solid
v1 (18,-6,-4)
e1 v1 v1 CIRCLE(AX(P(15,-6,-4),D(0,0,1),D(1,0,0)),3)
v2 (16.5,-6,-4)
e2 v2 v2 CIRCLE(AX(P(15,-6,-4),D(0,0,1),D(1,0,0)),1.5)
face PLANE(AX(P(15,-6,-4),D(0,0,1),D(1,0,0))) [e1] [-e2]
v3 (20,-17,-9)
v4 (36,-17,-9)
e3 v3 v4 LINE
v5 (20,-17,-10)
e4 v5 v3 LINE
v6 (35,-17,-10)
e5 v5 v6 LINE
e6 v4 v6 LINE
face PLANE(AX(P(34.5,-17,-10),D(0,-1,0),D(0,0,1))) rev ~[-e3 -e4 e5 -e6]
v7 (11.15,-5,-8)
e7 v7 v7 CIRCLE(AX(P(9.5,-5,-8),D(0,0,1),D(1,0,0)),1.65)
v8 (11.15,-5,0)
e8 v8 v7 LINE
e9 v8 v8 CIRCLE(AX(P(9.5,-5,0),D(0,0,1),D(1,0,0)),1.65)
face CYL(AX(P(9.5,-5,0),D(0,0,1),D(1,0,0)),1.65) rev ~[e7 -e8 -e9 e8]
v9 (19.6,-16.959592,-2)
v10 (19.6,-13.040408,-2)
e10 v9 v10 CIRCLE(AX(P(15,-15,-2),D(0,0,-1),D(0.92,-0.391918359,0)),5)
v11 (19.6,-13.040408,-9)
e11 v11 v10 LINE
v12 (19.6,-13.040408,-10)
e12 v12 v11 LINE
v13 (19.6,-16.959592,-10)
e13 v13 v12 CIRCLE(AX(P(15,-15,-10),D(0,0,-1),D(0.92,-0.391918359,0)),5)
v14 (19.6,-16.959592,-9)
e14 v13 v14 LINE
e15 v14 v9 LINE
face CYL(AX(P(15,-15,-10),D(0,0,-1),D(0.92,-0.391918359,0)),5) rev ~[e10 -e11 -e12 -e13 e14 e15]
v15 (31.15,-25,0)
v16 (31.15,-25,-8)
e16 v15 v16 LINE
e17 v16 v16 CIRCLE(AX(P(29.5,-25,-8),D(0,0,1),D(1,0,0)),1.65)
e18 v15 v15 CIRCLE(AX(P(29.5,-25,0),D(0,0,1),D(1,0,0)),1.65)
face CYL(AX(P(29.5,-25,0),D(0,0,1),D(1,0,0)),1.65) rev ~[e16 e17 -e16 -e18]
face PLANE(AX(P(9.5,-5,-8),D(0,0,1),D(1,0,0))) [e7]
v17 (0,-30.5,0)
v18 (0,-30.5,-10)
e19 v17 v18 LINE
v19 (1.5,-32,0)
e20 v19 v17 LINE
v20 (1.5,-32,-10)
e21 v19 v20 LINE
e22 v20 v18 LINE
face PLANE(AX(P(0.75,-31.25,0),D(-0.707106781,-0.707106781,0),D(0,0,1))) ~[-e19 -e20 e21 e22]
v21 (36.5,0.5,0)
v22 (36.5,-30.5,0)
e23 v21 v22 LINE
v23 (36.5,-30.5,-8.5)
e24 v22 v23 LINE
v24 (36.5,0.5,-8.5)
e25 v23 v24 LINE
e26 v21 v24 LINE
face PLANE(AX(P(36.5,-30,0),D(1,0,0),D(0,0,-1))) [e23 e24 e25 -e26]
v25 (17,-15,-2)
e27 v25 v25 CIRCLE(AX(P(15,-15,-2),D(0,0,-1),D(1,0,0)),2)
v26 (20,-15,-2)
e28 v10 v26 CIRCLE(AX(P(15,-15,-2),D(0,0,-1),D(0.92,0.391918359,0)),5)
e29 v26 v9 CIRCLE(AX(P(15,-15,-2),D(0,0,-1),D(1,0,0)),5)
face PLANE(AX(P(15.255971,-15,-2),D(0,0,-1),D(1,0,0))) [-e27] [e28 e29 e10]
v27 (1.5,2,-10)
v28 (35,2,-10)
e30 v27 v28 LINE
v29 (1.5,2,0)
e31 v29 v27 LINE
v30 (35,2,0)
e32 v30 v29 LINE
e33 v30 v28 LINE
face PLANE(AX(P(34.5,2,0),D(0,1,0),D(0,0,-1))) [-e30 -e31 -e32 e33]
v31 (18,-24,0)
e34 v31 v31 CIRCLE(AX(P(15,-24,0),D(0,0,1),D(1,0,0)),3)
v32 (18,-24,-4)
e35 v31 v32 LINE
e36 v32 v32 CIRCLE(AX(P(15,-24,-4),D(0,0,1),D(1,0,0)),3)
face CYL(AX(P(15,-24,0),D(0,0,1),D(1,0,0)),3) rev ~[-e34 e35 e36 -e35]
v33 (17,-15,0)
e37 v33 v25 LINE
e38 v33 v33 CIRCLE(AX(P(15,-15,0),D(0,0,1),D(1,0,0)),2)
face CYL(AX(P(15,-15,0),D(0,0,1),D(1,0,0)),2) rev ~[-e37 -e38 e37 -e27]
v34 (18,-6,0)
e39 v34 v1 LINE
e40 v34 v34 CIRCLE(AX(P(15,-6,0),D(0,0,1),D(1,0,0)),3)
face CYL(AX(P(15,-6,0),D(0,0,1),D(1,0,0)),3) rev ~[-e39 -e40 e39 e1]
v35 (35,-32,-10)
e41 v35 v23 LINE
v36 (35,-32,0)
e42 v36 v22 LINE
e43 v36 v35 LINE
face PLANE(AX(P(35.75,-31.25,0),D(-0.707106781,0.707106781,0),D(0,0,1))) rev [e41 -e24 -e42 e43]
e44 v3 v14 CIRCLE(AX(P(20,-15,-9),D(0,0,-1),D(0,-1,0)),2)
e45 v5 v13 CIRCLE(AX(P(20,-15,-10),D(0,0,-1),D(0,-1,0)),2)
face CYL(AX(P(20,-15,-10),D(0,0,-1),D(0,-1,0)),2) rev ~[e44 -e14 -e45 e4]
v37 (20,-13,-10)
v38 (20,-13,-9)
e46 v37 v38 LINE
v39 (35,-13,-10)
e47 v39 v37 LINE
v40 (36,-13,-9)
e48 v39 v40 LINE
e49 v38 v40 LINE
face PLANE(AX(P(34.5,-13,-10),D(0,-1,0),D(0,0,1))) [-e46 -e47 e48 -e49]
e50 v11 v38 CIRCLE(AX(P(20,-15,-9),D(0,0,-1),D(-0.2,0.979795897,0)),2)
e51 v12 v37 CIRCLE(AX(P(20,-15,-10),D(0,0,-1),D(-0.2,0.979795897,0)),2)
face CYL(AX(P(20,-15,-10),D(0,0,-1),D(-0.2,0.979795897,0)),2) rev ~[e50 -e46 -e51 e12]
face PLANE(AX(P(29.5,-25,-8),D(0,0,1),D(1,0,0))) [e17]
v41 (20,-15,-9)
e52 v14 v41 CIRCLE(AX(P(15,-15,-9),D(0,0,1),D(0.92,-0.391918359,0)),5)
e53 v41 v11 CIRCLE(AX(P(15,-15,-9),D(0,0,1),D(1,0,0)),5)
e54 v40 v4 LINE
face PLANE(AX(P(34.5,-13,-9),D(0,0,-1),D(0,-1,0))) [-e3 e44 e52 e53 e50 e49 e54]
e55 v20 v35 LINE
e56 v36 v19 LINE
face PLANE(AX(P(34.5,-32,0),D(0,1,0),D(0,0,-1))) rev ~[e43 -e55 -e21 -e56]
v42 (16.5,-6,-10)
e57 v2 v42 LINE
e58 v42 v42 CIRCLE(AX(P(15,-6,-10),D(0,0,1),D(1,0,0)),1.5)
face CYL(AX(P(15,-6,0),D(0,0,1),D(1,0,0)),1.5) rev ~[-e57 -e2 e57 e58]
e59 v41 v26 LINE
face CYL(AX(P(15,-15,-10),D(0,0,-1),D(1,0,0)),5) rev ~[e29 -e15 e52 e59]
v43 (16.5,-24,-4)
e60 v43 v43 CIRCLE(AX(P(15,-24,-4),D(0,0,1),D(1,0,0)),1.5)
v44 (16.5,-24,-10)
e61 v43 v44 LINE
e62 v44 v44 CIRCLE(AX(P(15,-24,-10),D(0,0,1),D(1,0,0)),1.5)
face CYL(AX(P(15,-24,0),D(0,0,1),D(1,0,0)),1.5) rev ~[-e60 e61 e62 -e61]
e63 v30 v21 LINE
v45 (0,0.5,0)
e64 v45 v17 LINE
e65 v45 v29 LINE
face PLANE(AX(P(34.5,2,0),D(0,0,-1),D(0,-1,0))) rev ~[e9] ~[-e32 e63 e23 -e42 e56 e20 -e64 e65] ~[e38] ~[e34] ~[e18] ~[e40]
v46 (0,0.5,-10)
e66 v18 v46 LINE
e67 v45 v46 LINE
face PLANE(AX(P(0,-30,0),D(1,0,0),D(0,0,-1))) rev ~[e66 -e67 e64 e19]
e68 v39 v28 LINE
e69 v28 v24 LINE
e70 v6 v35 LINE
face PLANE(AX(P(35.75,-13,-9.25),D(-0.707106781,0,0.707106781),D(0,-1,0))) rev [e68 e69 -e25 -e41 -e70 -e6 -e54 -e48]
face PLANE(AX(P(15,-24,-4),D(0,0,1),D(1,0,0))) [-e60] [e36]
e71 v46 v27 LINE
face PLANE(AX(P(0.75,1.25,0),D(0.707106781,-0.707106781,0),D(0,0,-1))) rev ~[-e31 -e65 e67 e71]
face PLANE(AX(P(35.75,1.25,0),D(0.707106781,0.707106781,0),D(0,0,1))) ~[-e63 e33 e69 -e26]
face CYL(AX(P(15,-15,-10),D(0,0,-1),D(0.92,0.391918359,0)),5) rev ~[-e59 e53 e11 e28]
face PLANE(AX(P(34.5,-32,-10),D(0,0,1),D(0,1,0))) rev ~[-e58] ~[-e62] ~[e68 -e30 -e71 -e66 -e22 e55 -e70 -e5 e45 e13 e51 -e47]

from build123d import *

# Parameters (mm, degrees)
F0_W        = 30
F0_H        = 30
F0_R        = 3
F0_R_2      = 1.65
F0_R_3      = 2
F0_R_4      = 1.5
F1_DEPTH    = 10
F2_DEPTH    = 12
F3_DEPTH    = 4
F4_R        = 2
F5_DEPTH    = 8
F6_DEPTH    = 1
F7_DEPTH    = 4.5
F8_DEPTH    = 2
F9_DEPTH    = 2
F10_DEPTH   = 2
F11_C1_SIZE = 1.5
F11_C2_SIZE = 1.5
F11_C3_SIZE = 1.5
F11_C4_SIZE = 1.5
F11_C5_SIZE = 1.5
F12_R       = 1.65
F13_DEPTH   = 8


# Not quite as in the source:
# - a feature names something its author has since deleted; it is built from what else it names


with BuildPart() as f1:
    # F0 (on Top) → F1 (new body)
    with BuildSketch(Plane.XY):
        with Locations((15, -15)):
            Rectangle(F0_W, F0_H)
        with Locations((15, -24)):
            Circle(F0_R, mode=Mode.SUBTRACT)
        with Locations((6, -15)):
            Circle(F0_R, mode=Mode.SUBTRACT)
        with Locations((9.5, -5)):
            Circle(F0_R_2, mode=Mode.SUBTRACT)
        with Locations((15, -15)):
            Circle(F0_R_3, mode=Mode.SUBTRACT)
        with Locations((24, -15)):
            Circle(F0_R, mode=Mode.SUBTRACT)
        with Locations((15, -6)):
            Circle(F0_R, mode=Mode.SUBTRACT)
        with Locations((15, -6)):
            Circle(F0_R)
        with Locations((15, -6)):
            Circle(F0_R_4, mode=Mode.SUBTRACT)
        with Locations((15, -24)):
            Circle(F0_R)
        with Locations((15, -24)):
            Circle(F0_R_4, mode=Mode.SUBTRACT)
        with Locations((24, -15)):
            Circle(F0_R)
        with Locations((24, -15)):
            Circle(F0_R_4, mode=Mode.SUBTRACT)
        with Locations((6, -15)):
            Circle(F0_R)
        with Locations((6, -15)):
            Circle(F0_R_4, mode=Mode.SUBTRACT)
        with Locations((15, -15)):
            Circle(F0_R_3)
        with Locations((9.5, -5)):
            Circle(F0_R_2)
        with Locations((6, -15)):
            Circle(F0_R_4)
        with Locations((24, -15)):
            Circle(F0_R_4)
    extrude(amount=-F1_DEPTH)

    # F0 (on Top) → F2 (cut)
    with BuildSketch(Plane.XY):
        with Locations((15, -15)):
            Circle(F0_R_3)
    extrude(amount=-F2_DEPTH, mode=Mode.SUBTRACT)

    # F0 (on Top) → F3 (cut)
    with BuildSketch(Plane.XY):
        with Locations((15, -24)):
            Circle(F0_R)
        with Locations((15, -24)):
            Circle(F0_R_4, mode=Mode.SUBTRACT)
        with Locations((15, -6)):
            Circle(F0_R)
        with Locations((15, -6)):
            Circle(F0_R_4, mode=Mode.SUBTRACT)
    extrude(amount=-F3_DEPTH, mode=Mode.SUBTRACT)

    # F4 (on face) → F5 (cut)
    with BuildSketch(Plane(origin=(0, 0, -10), x_dir=(1, 0, 0), z_dir=(0, 0, -1))):
        with BuildLine():
            ThreePointArc((19.6, 13.0404082058), (18, 15), (19.6, 16.9595917942))
            ThreePointArc((19.6, 16.9595917942), (10, 15), (19.6, 13.0404082058))
        make_face()
        with Locations((15, 15)):
            Circle(F4_R, mode=Mode.SUBTRACT)
        with BuildLine():
            ThreePointArc((19.6, 13.0404082058), (19.8989794856, 14), (20, 15))
            ThreePointArc((20, 15), (19.8989794856, 16), (19.6, 16.9595917942))
            ThreePointArc((19.6, 16.9595917942), (18, 15), (19.6, 13.0404082058))
        make_face()
    extrude(amount=-F5_DEPTH, mode=Mode.SUBTRACT)

    # F4 (on face) → F6 (cut)
    with BuildSketch(Plane(origin=(0, 0, -10), x_dir=(1, 0, 0), z_dir=(0, 0, -1))):
        with BuildLine():
            ThreePointArc((19.6, 16.9595917942), (19.8989794856, 16), (20, 15))
            ThreePointArc((20, 15), (19.8989794856, 14), (19.6, 13.0404082058))
            ThreePointArc((19.6, 13.0404082058), (19.798982076, 13.010127694), (20, 13))
            Line((20, 13), (30, 13))
            Line((30, 13), (30, 17))
            Line((30, 17), (20, 17))
            ThreePointArc((20, 17), (19.798982076, 16.989872306), (19.6, 16.9595917942))
        make_face()
    extrude(amount=-F6_DEPTH, mode=Mode.SUBTRACT)

    # F7 (add): a face of the model
    f7_faces = [f1.faces().sort_by_distance(p)[0] for p in [
        (30, -15, -4.9391891892),
    ]]
    extrude(f7_faces, amount=F7_DEPTH)

    # F8 (add): a face of the model
    f8_faces = [f1.faces().sort_by_distance(p)[0] for p in [
        (17.25, 0, -5),
    ]]
    extrude(f8_faces, amount=F8_DEPTH)

    # F9 (add): a face of the model
    f9_faces = [f1.faces().sort_by_distance(p)[0] for p in [
        (17.25, -30, -5),
    ]]
    extrude(f9_faces, amount=F9_DEPTH)

    # F10 (add): a face of the model
    f10_faces = [f1.faces().sort_by_distance(p)[0] for p in [
        (34.5, -15, -4.9464285714),
    ]]
    extrude(f10_faces, amount=F10_DEPTH)

    # F11: chamfer of 1.5 on 6 edges, made by hand

    # F11_c1
    f11_c1_edges = [f1.edges().sort_by_distance(p)[0] for p in [
        (36.5, -5.5, -10),
    ]]
    chamfer(f11_c1_edges, length=F11_C1_SIZE)

    # F11_c2
    f11_c2_edges = [f1.edges().sort_by_distance(p)[0] for p in [
        (0, -32, -5),
    ]]
    chamfer(f11_c2_edges, length=F11_C2_SIZE)

    # F11_c3
    f11_c3_edges = [f1.edges().sort_by_distance(p)[0] for p in [
        (36.5, -32, -4.25),
    ]]
    chamfer(f11_c3_edges, length=F11_C3_SIZE)

    # F11_c4
    f11_c4_edges = [f1.edges().sort_by_distance(p)[0] for p in [
        (0, 2, -5),
    ]]
    chamfer(f11_c4_edges, length=F11_C4_SIZE)

    # F11_c5
    f11_c5_edges = [f1.edges().sort_by_distance(p)[0] for p in [
        (36.5, 2, -4.25),
    ]]
    chamfer(f11_c5_edges, length=F11_C5_SIZE)

    # F0 (on Top) + F12 (on face) → F13 (cut)
    with BuildSketch(Plane.XY):
        with Locations((9.5, -5)):
            Circle(F0_R_2)
    with BuildSketch(Plane.XY):
        with Locations((29.5, -25)):
            Circle(F12_R)
    extrude(amount=-F13_DEPTH, mode=Mode.SUBTRACT)


solid = f1.part
